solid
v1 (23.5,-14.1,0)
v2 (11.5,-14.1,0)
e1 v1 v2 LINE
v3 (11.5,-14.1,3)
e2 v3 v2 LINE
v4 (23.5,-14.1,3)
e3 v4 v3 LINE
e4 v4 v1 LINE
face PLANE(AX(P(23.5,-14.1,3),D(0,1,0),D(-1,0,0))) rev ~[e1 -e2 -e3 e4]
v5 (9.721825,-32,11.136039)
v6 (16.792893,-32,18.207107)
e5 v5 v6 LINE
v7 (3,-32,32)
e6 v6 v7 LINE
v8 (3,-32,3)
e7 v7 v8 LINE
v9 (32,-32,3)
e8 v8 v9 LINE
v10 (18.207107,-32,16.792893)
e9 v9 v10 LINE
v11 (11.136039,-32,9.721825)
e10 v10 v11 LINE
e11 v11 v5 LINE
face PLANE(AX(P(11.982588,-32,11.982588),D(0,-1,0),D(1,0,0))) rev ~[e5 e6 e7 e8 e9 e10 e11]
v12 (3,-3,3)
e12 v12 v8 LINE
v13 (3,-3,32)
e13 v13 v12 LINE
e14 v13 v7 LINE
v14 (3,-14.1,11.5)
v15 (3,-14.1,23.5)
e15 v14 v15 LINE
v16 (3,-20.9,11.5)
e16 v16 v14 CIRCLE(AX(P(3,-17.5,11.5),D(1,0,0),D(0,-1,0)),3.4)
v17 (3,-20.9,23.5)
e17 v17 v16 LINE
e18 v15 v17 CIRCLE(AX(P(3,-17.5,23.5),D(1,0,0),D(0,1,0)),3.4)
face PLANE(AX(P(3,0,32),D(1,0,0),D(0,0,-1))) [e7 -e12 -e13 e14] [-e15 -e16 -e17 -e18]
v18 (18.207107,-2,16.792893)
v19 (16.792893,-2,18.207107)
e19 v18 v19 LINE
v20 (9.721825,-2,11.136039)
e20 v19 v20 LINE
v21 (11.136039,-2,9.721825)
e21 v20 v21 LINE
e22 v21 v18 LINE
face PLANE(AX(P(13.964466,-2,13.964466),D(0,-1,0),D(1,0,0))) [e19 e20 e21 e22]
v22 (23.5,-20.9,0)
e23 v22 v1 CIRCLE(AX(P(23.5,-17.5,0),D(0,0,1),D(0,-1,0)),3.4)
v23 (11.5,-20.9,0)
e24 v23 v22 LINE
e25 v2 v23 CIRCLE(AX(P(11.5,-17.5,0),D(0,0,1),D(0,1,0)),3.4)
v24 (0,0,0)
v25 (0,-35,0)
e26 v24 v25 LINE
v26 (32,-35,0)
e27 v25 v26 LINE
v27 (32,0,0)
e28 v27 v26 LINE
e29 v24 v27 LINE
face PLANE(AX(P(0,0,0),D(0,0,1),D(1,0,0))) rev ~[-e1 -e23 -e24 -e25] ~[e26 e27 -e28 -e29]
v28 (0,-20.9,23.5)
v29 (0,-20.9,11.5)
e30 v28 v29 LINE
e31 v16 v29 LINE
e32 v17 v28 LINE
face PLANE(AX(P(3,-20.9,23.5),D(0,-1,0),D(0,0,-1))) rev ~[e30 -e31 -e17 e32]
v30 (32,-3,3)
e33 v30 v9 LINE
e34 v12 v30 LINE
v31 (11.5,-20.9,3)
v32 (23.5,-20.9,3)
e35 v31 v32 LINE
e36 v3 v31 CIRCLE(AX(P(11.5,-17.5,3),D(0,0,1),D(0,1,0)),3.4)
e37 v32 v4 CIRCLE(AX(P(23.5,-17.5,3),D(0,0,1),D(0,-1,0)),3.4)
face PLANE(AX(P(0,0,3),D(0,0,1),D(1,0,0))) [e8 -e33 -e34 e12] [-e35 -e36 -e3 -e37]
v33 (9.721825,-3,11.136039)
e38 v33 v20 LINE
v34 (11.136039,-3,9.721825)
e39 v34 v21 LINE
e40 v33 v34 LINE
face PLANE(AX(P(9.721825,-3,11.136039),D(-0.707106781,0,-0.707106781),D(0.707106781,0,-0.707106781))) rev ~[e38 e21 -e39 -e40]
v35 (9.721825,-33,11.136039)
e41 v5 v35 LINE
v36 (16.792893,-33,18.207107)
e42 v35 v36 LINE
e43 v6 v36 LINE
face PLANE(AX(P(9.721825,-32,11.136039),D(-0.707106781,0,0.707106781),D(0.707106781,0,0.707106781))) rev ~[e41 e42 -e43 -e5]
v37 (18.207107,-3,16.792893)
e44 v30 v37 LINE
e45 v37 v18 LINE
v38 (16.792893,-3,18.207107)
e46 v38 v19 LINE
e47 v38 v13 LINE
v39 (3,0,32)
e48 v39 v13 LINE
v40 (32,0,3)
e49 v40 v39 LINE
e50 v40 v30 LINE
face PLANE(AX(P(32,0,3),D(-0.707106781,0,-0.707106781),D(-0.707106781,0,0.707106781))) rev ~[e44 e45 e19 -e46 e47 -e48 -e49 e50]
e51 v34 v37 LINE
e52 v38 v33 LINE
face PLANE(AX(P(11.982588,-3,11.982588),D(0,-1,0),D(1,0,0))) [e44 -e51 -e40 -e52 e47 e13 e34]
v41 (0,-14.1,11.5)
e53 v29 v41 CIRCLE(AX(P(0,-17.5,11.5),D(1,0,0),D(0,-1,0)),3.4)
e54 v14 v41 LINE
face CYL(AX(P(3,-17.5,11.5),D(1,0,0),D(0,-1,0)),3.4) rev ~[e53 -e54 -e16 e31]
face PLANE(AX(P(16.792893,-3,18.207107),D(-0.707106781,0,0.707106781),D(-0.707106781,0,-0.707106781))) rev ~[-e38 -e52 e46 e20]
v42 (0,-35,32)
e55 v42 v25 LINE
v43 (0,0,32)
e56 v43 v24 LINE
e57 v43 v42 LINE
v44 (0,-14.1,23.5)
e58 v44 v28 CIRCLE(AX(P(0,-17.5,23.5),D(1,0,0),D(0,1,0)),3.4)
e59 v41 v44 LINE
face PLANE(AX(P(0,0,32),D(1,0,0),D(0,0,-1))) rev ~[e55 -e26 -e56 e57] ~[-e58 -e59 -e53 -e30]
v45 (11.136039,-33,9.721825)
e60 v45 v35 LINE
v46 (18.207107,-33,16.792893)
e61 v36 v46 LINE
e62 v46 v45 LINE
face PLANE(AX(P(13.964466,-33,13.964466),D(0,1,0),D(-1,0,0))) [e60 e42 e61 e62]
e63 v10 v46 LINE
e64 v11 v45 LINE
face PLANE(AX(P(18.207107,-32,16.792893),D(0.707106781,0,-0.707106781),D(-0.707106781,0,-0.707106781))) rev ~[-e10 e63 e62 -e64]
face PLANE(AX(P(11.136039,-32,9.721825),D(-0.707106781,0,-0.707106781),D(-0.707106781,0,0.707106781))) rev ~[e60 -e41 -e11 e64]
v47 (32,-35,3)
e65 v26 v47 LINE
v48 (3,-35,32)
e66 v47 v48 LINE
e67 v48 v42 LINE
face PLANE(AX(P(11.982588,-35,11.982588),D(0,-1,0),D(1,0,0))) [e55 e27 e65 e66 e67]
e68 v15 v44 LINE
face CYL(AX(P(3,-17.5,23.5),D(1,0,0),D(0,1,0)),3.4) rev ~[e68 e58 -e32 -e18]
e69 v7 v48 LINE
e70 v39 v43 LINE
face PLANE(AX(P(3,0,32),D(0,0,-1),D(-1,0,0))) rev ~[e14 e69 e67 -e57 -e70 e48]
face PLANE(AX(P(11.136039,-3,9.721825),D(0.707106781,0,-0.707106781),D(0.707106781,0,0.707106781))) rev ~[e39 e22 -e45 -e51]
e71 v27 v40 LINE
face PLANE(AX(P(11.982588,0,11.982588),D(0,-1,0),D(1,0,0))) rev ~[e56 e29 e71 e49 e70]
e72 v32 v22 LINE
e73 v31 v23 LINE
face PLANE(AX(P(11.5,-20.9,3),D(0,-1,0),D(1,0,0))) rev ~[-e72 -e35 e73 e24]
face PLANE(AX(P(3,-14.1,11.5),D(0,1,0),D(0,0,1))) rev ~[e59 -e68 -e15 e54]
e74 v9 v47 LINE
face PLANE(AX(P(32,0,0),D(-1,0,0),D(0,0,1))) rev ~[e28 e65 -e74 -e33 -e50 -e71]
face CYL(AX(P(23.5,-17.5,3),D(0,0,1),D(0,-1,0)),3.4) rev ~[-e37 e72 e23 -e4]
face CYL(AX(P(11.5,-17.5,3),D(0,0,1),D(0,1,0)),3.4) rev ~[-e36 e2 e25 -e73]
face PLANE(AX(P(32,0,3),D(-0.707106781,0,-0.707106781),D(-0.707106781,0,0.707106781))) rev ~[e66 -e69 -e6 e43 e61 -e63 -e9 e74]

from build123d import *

# Parameters (mm, degrees)
F1_DEPTH  = 35
F2_T      = 3
F4_DEPTH  = 3
F6_DEPTH  = 3
F8_DEPTH  = 1
F10_DEPTH = 1


# Not quite as in the source:
# - a shell that OpenCascade refuses in one call is made with other operations: the cavity is built on its own and cut out


with BuildPart() as f1:
    # F0 (on Front) → F1 (new body)
    with BuildSketch(Plane.XZ):
        Polygon((0, 32), (0, 0), (32, 0), (32, 3), (3, 32), align=None)
    extrude(amount=F1_DEPTH)

    # F2: shell of thickness 3, made by hand


with BuildPart() as f2_core1:
    # F2_t2: copy of F1
    add(f1.part)

    # the walls: a layer under each face that stays
    f2_faces = [f2_core1.faces().sort_by_distance(p)[0] for p in [
        (0, -17.5, 16),
        (16, -17.5, 0),
        (16, 0, 16),
        (16, -35, 16),
    ]]
    thicken(f2_faces, amount=-F2_T, mode=Mode.SUBTRACT)


with BuildPart() as f1_1:
    add(f1.part)

    # what is left inside the walls is the cavity
    f2_cavity = [f2_core1.part.solids().sort_by_distance(p)[0] for p in [
        (17.478787, -22.333333, 17.478787),
    ]]
    add(f2_cavity, mode=Mode.SUBTRACT)

    # F3 (on face) → F4 (cut)
    with BuildSketch(Plane.XY.offset(3)):
        with BuildLine():
            Line((11.5, -20.9), (23.5, -20.9))
            ThreePointArc((23.5, -20.9), (26.9, -17.5), (23.5, -14.1))
            Line((23.5, -14.1), (11.5, -14.1))
            ThreePointArc((11.5, -14.1), (8.1, -17.5), (11.5, -20.9))
        make_face()
    extrude(amount=-F4_DEPTH, mode=Mode.SUBTRACT)

    # F5 (on face) → F6 (cut)
    with BuildSketch(Plane.YZ.offset(3)):
        with BuildLine():
            Line((-14.1, 11.5), (-14.1, 23.5))
            ThreePointArc((-14.1, 23.5), (-17.5, 26.9), (-20.9, 23.5))
            Line((-20.9, 23.5), (-20.9, 11.5))
            ThreePointArc((-20.9, 11.5), (-17.5, 8.1), (-14.1, 11.5))
        make_face()
    extrude(amount=-F6_DEPTH, mode=Mode.SUBTRACT)

    # F7 (on face) → F8 (cut)
    with BuildSketch(Plane.XZ.offset(3)):
        Polygon((11.1360389693, 9.7218254069), (18.2071067812, 16.7928932188), (16.7928932188, 18.2071067812), (9.7218254069, 11.1360389693), align=None)
    extrude(amount=-F8_DEPTH, mode=Mode.SUBTRACT)

    # F9 (on face) → F10 (cut)
    with BuildSketch(Plane(origin=(0, -32, 0), x_dir=(-1, 0, 0), z_dir=(0, 1, 0))):
        Polygon((-16.7928932188, 18.2071067812), (-18.2071067812, 16.7928932188), (-11.1360389693, 9.7218254069), (-9.7218254069, 11.1360389693), align=None)
    extrude(amount=-F10_DEPTH, mode=Mode.SUBTRACT)


solid = f1_1.part
